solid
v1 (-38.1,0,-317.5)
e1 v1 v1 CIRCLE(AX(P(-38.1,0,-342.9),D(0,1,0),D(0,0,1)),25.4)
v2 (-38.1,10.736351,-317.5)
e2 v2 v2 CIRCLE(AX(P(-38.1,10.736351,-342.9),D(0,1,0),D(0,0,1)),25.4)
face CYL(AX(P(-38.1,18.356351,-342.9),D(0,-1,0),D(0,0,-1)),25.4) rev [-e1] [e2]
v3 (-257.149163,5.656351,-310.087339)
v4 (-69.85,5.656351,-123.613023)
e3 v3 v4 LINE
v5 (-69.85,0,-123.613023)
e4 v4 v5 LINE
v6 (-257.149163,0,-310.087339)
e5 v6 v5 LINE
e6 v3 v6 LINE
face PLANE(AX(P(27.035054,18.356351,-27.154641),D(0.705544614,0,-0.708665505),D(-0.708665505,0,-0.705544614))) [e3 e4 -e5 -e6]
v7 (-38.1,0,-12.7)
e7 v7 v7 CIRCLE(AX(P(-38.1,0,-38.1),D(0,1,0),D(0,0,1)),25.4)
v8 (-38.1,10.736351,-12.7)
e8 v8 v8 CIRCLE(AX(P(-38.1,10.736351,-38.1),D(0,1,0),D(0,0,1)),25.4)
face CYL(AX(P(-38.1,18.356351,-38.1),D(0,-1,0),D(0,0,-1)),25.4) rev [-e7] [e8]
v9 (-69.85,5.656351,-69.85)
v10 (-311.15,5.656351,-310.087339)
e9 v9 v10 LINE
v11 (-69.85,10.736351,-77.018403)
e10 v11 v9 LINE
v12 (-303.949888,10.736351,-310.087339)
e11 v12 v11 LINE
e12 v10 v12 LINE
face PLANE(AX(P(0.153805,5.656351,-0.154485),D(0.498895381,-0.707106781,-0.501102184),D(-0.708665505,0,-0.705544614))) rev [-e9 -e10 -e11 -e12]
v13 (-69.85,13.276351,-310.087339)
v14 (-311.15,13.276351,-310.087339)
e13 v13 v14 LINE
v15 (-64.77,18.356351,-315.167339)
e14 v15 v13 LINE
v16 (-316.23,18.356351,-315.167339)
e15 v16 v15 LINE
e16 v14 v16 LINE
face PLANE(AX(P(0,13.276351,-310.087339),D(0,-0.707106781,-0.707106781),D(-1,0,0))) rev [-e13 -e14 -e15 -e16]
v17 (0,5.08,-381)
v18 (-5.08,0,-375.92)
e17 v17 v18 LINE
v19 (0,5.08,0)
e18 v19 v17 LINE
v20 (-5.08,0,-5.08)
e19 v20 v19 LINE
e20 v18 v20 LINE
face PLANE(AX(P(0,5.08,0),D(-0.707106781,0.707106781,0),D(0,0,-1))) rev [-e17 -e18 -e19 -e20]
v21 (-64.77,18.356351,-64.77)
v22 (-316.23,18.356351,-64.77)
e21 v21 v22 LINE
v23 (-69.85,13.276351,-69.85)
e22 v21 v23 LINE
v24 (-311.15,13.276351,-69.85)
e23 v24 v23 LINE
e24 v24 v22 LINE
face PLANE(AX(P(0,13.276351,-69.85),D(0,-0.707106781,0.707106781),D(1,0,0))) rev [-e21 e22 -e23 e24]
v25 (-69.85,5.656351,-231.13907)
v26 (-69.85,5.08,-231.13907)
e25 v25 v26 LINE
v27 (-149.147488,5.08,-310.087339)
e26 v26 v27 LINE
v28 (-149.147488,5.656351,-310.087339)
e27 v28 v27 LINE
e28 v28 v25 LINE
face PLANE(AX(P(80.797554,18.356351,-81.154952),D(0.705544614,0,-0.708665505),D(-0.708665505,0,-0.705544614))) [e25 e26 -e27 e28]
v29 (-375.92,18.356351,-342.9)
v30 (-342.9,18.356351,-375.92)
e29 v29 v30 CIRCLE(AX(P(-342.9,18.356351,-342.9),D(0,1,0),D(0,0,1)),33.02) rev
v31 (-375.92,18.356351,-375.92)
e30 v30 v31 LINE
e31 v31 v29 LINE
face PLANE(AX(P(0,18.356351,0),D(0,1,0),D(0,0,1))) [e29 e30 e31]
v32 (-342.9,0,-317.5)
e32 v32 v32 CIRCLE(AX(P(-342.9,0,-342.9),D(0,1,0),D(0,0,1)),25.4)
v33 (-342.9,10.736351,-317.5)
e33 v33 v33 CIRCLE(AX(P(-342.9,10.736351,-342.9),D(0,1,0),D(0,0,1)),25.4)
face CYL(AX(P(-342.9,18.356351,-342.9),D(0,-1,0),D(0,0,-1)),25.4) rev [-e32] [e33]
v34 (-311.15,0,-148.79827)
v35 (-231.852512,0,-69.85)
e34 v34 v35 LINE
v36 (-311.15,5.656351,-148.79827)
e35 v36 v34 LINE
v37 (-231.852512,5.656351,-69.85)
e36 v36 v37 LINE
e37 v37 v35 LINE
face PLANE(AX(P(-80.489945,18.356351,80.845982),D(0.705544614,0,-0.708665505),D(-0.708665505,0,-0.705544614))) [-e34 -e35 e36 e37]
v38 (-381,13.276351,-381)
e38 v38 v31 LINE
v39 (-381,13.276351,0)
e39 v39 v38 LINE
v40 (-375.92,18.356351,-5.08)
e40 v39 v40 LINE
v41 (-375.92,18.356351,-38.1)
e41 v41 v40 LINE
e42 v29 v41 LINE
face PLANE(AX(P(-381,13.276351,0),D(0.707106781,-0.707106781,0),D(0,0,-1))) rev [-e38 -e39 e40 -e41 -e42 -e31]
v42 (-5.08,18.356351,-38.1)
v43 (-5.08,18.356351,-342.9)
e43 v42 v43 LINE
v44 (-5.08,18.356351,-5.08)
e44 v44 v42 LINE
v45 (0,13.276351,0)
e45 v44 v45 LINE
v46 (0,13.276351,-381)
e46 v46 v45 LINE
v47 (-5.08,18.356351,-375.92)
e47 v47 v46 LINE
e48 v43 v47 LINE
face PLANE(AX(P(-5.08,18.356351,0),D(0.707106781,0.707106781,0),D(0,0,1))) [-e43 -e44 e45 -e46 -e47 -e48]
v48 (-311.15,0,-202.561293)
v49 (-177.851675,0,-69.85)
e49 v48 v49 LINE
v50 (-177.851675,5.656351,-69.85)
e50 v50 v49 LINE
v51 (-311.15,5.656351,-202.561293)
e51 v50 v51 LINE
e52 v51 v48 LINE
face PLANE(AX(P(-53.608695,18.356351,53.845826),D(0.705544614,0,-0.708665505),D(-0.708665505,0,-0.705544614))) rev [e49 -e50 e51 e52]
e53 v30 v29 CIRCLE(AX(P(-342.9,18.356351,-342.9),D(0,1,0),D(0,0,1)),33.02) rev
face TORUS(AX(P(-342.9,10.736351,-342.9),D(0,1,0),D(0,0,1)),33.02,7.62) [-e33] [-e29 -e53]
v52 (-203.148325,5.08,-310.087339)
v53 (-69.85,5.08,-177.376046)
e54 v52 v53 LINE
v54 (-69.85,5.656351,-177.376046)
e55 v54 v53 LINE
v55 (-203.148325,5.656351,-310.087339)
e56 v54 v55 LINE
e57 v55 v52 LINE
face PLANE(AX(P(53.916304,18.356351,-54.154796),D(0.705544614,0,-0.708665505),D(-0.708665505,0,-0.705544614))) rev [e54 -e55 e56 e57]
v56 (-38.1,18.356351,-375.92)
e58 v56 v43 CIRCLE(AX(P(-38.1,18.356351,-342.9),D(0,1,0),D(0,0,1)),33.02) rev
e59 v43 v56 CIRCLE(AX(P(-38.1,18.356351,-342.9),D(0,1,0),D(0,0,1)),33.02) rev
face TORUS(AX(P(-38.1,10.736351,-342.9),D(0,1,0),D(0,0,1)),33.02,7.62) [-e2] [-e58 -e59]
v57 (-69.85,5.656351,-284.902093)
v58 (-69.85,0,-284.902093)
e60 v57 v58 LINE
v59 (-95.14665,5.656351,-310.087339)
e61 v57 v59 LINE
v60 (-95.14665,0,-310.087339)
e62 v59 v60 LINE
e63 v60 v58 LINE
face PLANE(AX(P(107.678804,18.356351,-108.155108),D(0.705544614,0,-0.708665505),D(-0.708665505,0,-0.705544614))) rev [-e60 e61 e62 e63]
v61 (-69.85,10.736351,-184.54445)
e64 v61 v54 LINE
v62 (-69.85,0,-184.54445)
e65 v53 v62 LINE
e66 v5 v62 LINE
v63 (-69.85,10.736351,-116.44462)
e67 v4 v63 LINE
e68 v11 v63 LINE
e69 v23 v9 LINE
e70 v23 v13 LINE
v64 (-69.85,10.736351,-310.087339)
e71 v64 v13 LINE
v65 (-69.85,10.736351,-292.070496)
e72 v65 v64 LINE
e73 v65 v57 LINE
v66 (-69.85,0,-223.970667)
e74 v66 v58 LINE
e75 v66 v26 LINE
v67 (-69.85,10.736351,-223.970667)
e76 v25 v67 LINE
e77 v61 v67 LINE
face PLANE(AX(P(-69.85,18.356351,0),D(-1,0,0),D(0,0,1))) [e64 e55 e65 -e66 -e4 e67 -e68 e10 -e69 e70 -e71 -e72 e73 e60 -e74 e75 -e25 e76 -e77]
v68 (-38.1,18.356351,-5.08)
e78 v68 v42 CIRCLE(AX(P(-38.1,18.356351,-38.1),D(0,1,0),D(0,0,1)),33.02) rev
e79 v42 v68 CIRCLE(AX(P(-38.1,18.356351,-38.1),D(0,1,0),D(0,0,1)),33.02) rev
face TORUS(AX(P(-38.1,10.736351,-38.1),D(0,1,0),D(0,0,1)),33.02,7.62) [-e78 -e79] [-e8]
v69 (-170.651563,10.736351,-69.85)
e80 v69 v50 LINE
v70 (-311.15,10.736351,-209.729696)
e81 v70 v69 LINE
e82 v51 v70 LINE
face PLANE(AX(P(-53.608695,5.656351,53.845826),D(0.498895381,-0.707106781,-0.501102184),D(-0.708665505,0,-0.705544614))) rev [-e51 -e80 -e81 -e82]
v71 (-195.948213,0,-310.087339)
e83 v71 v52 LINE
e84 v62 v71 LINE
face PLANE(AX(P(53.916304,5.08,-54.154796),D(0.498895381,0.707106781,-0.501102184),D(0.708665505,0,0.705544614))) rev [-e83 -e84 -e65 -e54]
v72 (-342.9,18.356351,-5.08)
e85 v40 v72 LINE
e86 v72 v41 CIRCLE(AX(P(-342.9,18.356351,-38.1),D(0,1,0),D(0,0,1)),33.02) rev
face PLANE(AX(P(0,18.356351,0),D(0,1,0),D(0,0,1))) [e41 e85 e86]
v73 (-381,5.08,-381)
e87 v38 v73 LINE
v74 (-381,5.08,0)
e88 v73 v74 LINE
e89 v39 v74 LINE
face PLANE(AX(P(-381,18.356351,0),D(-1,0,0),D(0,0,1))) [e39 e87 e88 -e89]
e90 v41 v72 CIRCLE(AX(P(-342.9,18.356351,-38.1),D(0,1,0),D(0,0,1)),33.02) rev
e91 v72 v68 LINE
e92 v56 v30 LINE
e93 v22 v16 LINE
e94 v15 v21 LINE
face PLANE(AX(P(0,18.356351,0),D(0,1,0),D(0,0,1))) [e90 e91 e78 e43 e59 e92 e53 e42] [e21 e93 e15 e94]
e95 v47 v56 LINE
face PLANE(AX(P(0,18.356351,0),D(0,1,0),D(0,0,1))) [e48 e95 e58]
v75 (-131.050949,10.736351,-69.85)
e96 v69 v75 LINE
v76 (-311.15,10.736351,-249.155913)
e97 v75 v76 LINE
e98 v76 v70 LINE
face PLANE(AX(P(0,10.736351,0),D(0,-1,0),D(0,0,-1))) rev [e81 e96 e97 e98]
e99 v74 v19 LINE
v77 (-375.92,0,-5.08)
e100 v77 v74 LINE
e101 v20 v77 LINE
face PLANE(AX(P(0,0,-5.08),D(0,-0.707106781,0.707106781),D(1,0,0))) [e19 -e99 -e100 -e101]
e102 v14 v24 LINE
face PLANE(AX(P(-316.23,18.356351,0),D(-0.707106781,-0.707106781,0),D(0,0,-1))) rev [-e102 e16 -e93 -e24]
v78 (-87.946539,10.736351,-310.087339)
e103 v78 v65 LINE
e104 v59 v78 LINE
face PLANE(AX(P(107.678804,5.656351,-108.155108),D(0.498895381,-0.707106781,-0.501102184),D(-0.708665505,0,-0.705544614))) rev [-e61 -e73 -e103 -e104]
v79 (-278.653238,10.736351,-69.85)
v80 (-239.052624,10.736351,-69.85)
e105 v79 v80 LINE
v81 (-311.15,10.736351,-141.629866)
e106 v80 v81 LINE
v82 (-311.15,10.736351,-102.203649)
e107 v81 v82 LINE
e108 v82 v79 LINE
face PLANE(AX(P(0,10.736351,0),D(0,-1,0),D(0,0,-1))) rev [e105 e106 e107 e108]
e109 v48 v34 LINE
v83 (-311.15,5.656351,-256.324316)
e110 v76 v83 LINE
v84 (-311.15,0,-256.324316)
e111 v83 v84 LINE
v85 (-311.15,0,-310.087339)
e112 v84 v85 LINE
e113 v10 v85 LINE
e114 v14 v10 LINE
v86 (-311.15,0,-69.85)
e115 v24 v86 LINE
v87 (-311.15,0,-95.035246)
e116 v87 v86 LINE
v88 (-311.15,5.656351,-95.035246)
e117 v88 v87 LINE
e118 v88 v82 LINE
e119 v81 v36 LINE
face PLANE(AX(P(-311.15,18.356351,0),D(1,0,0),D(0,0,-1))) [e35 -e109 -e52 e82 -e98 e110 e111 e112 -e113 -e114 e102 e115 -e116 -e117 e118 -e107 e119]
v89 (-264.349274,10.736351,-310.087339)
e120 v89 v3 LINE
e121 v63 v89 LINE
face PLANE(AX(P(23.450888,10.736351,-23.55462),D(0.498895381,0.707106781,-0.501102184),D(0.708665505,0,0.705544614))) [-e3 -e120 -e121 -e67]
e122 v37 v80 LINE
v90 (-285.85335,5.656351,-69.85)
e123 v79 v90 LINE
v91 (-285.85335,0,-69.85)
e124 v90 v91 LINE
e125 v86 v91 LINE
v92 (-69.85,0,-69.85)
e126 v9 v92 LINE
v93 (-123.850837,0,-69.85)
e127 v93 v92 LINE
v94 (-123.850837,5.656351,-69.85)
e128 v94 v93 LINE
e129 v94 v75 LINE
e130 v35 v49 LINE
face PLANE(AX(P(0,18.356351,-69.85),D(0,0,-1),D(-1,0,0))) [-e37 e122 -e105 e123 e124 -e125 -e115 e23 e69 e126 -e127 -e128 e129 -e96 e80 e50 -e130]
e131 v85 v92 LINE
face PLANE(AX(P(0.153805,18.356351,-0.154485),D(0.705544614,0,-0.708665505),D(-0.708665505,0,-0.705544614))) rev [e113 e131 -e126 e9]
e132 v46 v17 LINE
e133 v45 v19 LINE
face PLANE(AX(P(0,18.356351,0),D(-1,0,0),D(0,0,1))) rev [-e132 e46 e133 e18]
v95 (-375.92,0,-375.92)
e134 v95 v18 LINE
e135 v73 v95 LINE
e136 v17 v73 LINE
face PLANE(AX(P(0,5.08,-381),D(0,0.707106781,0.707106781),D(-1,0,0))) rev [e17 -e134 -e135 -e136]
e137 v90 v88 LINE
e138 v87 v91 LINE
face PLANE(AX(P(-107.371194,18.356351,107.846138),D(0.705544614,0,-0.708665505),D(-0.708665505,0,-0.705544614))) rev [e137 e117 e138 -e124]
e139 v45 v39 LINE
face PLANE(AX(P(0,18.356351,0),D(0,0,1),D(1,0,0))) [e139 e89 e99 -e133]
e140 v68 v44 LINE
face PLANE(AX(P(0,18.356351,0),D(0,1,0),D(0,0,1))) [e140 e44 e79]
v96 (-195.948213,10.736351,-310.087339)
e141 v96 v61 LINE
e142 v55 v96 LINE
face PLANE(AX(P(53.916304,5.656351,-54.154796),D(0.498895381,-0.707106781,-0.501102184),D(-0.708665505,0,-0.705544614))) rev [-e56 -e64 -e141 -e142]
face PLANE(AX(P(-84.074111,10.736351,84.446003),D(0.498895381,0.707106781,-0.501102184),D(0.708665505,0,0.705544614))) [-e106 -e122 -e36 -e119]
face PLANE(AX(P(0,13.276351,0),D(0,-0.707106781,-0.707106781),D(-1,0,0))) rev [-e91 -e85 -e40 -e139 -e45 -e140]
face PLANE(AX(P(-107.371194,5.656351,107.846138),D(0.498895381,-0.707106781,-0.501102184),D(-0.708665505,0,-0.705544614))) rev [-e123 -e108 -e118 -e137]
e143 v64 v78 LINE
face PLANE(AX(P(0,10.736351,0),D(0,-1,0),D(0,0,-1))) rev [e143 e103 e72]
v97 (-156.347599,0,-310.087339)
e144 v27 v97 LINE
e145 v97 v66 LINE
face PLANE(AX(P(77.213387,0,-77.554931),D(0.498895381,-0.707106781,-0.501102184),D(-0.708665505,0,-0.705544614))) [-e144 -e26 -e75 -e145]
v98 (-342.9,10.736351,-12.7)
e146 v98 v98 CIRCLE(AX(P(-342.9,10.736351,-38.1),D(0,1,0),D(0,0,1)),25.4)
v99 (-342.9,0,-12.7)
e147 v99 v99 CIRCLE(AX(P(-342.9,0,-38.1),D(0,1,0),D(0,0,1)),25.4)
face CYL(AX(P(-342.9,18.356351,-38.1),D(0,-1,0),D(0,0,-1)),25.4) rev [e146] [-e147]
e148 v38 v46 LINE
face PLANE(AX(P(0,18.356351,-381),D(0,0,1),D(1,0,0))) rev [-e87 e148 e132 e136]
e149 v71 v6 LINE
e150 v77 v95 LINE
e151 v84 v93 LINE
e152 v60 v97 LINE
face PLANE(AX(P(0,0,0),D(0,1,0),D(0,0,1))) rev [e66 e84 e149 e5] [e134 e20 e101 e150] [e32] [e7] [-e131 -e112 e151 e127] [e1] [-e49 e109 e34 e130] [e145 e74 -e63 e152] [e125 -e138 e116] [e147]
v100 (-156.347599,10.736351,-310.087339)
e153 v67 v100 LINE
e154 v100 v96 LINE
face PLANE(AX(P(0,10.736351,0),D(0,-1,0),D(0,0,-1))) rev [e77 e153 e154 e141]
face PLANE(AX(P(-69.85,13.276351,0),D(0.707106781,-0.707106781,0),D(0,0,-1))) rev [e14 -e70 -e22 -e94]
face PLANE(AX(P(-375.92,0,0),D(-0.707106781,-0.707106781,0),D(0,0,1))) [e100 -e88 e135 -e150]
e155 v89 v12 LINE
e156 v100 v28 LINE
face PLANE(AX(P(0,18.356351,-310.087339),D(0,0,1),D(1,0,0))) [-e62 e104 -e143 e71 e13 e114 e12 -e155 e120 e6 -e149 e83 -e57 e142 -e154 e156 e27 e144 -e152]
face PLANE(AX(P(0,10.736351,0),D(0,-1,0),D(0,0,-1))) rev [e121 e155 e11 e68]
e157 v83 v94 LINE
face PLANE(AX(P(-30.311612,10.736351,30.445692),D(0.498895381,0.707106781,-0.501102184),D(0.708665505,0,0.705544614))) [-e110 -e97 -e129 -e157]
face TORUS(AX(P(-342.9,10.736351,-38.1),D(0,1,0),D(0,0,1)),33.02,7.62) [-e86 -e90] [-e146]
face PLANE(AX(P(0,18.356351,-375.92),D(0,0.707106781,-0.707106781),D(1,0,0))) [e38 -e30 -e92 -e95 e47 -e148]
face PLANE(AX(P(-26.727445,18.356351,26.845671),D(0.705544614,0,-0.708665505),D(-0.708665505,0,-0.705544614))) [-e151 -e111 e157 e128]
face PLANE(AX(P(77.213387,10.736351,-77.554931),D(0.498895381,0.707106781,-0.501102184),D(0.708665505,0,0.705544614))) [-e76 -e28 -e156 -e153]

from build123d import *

# Parameters (mm, degrees)
SKETCH1_R           = 25.4
BOSS_EXTRUDE2_DEPTH = 18.356350904
CUT_EXTRUDE1_DEPTH  = 7.62
FILLET1_R           = 7.62
CHAMFER1_SIZE       = 5.08
CHAMFER2_SIZE       = 5.08
CHAMFER3_SIZE       = 5.08
CHAMFER4_SIZE       = 5.08
CHAMFER8_SIZE       = 5.08


with BuildPart() as part:
    # Sketch1 → Boss-Extrude2 (new body)
    with BuildSketch(Plane(origin=(0, 0, 0), x_dir=(1, 0, 0), z_dir=(0, 1, 0))):
        Polygon((-342.9, 381), (-381, 381), (-381, 0), (-342.9, 0), (-38.1, 0), (0, 0), (0, 381), (-38.1, 381), align=None)
        with Locations(Location((-342.9, 38.1, 0), (0, 0, 270))):
            Circle(SKETCH1_R, mode=Mode.SUBTRACT)
        Polygon((-285.853349775, 69.85), (-311.15, 69.85), (-311.15, 95.035246339), align=None, mode=Mode.SUBTRACT)
        Polygon((-311.15, 148.798269562), (-311.15, 190.5), (-311.15, 202.561292784), (-177.851674887, 69.85), (-231.852512331, 69.85), align=None, mode=Mode.SUBTRACT)
        with Locations(Location((-38.1, 38.1, 0), (0, 0, 270))):
            Circle(SKETCH1_R, mode=Mode.SUBTRACT)
        Polygon((-311.15, 256.324316007), (-311.15, 310.08733923), (-69.85, 69.85), (-123.850837444, 69.85), align=None, mode=Mode.SUBTRACT)
        with Locations(Location((-342.9, 342.9, 0), (0, 0, 270))):
            Circle(SKETCH1_R, mode=Mode.SUBTRACT)
        Polygon((-69.85, 177.376046445), (-69.85, 123.613023223), (-257.149162556, 310.08733923), (-203.148325113, 310.08733923), align=None, mode=Mode.SUBTRACT)
        Polygon((-149.147487669, 310.08733923), (-95.146650225, 310.08733923), (-69.85, 284.902092891), (-69.85, 231.139069668), align=None, mode=Mode.SUBTRACT)
        with Locations(Location((-38.1, 342.9, 0), (0, 0, 270))):
            Circle(SKETCH1_R, mode=Mode.SUBTRACT)
    extrude(amount=BOSS_EXTRUDE2_DEPTH)

    # Sketch3 → Cut-Extrude1 (cut)
    with BuildSketch(Plane(origin=(0, 18.356350904, 0), x_dir=(1, 0, 0), z_dir=(0, 1, 0))):
        Polygon((-69.85, 177.376046445), (-69.85, 310.08733923), (-311.15, 310.08733923), (-311.15, 69.85), (-69.85, 69.85), align=None)
    extrude(amount=-CUT_EXTRUDE1_DEPTH, mode=Mode.SUBTRACT)

    # Fillet1
    fillet1_edges = [part.edges().sort_by_distance(p)[0] for p in [
        (-38.1, 18.356350904, -63.5),
        (-38.1, 18.356350904, -368.3),
        (-342.9, 18.356350904, -63.5),
        (-342.9, 18.356350904, -368.3),
    ]]
    fillet(fillet1_edges, radius=FILLET1_R)

    # Chamfer1
    chamfer1_edges = [part.edges().sort_by_distance(p)[0] for p in [
        (-69.85, 18.356350904, -189.968669615),
        (-190.5, 18.356350904, -310.08733923),
        (-190.5, 18.356350904, -69.85),
        (-311.15, 18.356350904, -189.968669615),
    ]]
    chamfer(chamfer1_edges, length=CHAMFER1_SIZE)

    # Chamfer2
    chamfer2_edges = [part.edges().sort_by_distance(p)[0] for p in [
        (-298.501674887, 10.736350904, -82.442623169),
        (-271.501256165, 10.736350904, -109.324134781),
        (-244.500837444, 10.736350904, -136.205646392),
        (-217.500418722, 10.736350904, -163.087158004),
        (-136.499162556, 10.736350904, -243.731692838),
        (-109.498743835, 10.736350904, -270.613204449),
        (-190.5, 10.736350904, -189.968669615),
        (-163.499581278, 10.736350904, -216.850181226),
        (-82.498325113, 10.736350904, -297.49471606),
    ]]
    chamfer(chamfer2_edges, length=CHAMFER2_SIZE)

    # Chamfer3
    chamfer3_edges = [part.edges().sort_by_distance(p)[0] for p in [
        (-381, 18.356350904, -190.5),
        (-190.5, 18.356350904, 0),
        (0, 18.356350904, -190.5),
        (-190.5, 18.356350904, -381),
    ]]
    chamfer(chamfer3_edges, length=CHAMFER3_SIZE - 0.0001)  # a hair under: the kernel refuses the full size

    # Chamfer4
    chamfer4_edges = [part.edges().sort_by_distance(p)[0] for p in [
        (-190.5, 0, -381),
        (0, 0, -190.5),
        (-190.5, 0, 0),
        (-381, 0, -190.5),
    ]]
    chamfer(chamfer4_edges, length=CHAMFER4_SIZE)

    # Chamfer8
    chamfer8_edges = [part.edges().sort_by_distance(p)[0] for p in [
        (-136.499162556, 0, -243.731692838),
        (-109.498743835, 0, -270.613204449),
    ]]
    chamfer(chamfer8_edges, length=CHAMFER8_SIZE)


solid = part.part
